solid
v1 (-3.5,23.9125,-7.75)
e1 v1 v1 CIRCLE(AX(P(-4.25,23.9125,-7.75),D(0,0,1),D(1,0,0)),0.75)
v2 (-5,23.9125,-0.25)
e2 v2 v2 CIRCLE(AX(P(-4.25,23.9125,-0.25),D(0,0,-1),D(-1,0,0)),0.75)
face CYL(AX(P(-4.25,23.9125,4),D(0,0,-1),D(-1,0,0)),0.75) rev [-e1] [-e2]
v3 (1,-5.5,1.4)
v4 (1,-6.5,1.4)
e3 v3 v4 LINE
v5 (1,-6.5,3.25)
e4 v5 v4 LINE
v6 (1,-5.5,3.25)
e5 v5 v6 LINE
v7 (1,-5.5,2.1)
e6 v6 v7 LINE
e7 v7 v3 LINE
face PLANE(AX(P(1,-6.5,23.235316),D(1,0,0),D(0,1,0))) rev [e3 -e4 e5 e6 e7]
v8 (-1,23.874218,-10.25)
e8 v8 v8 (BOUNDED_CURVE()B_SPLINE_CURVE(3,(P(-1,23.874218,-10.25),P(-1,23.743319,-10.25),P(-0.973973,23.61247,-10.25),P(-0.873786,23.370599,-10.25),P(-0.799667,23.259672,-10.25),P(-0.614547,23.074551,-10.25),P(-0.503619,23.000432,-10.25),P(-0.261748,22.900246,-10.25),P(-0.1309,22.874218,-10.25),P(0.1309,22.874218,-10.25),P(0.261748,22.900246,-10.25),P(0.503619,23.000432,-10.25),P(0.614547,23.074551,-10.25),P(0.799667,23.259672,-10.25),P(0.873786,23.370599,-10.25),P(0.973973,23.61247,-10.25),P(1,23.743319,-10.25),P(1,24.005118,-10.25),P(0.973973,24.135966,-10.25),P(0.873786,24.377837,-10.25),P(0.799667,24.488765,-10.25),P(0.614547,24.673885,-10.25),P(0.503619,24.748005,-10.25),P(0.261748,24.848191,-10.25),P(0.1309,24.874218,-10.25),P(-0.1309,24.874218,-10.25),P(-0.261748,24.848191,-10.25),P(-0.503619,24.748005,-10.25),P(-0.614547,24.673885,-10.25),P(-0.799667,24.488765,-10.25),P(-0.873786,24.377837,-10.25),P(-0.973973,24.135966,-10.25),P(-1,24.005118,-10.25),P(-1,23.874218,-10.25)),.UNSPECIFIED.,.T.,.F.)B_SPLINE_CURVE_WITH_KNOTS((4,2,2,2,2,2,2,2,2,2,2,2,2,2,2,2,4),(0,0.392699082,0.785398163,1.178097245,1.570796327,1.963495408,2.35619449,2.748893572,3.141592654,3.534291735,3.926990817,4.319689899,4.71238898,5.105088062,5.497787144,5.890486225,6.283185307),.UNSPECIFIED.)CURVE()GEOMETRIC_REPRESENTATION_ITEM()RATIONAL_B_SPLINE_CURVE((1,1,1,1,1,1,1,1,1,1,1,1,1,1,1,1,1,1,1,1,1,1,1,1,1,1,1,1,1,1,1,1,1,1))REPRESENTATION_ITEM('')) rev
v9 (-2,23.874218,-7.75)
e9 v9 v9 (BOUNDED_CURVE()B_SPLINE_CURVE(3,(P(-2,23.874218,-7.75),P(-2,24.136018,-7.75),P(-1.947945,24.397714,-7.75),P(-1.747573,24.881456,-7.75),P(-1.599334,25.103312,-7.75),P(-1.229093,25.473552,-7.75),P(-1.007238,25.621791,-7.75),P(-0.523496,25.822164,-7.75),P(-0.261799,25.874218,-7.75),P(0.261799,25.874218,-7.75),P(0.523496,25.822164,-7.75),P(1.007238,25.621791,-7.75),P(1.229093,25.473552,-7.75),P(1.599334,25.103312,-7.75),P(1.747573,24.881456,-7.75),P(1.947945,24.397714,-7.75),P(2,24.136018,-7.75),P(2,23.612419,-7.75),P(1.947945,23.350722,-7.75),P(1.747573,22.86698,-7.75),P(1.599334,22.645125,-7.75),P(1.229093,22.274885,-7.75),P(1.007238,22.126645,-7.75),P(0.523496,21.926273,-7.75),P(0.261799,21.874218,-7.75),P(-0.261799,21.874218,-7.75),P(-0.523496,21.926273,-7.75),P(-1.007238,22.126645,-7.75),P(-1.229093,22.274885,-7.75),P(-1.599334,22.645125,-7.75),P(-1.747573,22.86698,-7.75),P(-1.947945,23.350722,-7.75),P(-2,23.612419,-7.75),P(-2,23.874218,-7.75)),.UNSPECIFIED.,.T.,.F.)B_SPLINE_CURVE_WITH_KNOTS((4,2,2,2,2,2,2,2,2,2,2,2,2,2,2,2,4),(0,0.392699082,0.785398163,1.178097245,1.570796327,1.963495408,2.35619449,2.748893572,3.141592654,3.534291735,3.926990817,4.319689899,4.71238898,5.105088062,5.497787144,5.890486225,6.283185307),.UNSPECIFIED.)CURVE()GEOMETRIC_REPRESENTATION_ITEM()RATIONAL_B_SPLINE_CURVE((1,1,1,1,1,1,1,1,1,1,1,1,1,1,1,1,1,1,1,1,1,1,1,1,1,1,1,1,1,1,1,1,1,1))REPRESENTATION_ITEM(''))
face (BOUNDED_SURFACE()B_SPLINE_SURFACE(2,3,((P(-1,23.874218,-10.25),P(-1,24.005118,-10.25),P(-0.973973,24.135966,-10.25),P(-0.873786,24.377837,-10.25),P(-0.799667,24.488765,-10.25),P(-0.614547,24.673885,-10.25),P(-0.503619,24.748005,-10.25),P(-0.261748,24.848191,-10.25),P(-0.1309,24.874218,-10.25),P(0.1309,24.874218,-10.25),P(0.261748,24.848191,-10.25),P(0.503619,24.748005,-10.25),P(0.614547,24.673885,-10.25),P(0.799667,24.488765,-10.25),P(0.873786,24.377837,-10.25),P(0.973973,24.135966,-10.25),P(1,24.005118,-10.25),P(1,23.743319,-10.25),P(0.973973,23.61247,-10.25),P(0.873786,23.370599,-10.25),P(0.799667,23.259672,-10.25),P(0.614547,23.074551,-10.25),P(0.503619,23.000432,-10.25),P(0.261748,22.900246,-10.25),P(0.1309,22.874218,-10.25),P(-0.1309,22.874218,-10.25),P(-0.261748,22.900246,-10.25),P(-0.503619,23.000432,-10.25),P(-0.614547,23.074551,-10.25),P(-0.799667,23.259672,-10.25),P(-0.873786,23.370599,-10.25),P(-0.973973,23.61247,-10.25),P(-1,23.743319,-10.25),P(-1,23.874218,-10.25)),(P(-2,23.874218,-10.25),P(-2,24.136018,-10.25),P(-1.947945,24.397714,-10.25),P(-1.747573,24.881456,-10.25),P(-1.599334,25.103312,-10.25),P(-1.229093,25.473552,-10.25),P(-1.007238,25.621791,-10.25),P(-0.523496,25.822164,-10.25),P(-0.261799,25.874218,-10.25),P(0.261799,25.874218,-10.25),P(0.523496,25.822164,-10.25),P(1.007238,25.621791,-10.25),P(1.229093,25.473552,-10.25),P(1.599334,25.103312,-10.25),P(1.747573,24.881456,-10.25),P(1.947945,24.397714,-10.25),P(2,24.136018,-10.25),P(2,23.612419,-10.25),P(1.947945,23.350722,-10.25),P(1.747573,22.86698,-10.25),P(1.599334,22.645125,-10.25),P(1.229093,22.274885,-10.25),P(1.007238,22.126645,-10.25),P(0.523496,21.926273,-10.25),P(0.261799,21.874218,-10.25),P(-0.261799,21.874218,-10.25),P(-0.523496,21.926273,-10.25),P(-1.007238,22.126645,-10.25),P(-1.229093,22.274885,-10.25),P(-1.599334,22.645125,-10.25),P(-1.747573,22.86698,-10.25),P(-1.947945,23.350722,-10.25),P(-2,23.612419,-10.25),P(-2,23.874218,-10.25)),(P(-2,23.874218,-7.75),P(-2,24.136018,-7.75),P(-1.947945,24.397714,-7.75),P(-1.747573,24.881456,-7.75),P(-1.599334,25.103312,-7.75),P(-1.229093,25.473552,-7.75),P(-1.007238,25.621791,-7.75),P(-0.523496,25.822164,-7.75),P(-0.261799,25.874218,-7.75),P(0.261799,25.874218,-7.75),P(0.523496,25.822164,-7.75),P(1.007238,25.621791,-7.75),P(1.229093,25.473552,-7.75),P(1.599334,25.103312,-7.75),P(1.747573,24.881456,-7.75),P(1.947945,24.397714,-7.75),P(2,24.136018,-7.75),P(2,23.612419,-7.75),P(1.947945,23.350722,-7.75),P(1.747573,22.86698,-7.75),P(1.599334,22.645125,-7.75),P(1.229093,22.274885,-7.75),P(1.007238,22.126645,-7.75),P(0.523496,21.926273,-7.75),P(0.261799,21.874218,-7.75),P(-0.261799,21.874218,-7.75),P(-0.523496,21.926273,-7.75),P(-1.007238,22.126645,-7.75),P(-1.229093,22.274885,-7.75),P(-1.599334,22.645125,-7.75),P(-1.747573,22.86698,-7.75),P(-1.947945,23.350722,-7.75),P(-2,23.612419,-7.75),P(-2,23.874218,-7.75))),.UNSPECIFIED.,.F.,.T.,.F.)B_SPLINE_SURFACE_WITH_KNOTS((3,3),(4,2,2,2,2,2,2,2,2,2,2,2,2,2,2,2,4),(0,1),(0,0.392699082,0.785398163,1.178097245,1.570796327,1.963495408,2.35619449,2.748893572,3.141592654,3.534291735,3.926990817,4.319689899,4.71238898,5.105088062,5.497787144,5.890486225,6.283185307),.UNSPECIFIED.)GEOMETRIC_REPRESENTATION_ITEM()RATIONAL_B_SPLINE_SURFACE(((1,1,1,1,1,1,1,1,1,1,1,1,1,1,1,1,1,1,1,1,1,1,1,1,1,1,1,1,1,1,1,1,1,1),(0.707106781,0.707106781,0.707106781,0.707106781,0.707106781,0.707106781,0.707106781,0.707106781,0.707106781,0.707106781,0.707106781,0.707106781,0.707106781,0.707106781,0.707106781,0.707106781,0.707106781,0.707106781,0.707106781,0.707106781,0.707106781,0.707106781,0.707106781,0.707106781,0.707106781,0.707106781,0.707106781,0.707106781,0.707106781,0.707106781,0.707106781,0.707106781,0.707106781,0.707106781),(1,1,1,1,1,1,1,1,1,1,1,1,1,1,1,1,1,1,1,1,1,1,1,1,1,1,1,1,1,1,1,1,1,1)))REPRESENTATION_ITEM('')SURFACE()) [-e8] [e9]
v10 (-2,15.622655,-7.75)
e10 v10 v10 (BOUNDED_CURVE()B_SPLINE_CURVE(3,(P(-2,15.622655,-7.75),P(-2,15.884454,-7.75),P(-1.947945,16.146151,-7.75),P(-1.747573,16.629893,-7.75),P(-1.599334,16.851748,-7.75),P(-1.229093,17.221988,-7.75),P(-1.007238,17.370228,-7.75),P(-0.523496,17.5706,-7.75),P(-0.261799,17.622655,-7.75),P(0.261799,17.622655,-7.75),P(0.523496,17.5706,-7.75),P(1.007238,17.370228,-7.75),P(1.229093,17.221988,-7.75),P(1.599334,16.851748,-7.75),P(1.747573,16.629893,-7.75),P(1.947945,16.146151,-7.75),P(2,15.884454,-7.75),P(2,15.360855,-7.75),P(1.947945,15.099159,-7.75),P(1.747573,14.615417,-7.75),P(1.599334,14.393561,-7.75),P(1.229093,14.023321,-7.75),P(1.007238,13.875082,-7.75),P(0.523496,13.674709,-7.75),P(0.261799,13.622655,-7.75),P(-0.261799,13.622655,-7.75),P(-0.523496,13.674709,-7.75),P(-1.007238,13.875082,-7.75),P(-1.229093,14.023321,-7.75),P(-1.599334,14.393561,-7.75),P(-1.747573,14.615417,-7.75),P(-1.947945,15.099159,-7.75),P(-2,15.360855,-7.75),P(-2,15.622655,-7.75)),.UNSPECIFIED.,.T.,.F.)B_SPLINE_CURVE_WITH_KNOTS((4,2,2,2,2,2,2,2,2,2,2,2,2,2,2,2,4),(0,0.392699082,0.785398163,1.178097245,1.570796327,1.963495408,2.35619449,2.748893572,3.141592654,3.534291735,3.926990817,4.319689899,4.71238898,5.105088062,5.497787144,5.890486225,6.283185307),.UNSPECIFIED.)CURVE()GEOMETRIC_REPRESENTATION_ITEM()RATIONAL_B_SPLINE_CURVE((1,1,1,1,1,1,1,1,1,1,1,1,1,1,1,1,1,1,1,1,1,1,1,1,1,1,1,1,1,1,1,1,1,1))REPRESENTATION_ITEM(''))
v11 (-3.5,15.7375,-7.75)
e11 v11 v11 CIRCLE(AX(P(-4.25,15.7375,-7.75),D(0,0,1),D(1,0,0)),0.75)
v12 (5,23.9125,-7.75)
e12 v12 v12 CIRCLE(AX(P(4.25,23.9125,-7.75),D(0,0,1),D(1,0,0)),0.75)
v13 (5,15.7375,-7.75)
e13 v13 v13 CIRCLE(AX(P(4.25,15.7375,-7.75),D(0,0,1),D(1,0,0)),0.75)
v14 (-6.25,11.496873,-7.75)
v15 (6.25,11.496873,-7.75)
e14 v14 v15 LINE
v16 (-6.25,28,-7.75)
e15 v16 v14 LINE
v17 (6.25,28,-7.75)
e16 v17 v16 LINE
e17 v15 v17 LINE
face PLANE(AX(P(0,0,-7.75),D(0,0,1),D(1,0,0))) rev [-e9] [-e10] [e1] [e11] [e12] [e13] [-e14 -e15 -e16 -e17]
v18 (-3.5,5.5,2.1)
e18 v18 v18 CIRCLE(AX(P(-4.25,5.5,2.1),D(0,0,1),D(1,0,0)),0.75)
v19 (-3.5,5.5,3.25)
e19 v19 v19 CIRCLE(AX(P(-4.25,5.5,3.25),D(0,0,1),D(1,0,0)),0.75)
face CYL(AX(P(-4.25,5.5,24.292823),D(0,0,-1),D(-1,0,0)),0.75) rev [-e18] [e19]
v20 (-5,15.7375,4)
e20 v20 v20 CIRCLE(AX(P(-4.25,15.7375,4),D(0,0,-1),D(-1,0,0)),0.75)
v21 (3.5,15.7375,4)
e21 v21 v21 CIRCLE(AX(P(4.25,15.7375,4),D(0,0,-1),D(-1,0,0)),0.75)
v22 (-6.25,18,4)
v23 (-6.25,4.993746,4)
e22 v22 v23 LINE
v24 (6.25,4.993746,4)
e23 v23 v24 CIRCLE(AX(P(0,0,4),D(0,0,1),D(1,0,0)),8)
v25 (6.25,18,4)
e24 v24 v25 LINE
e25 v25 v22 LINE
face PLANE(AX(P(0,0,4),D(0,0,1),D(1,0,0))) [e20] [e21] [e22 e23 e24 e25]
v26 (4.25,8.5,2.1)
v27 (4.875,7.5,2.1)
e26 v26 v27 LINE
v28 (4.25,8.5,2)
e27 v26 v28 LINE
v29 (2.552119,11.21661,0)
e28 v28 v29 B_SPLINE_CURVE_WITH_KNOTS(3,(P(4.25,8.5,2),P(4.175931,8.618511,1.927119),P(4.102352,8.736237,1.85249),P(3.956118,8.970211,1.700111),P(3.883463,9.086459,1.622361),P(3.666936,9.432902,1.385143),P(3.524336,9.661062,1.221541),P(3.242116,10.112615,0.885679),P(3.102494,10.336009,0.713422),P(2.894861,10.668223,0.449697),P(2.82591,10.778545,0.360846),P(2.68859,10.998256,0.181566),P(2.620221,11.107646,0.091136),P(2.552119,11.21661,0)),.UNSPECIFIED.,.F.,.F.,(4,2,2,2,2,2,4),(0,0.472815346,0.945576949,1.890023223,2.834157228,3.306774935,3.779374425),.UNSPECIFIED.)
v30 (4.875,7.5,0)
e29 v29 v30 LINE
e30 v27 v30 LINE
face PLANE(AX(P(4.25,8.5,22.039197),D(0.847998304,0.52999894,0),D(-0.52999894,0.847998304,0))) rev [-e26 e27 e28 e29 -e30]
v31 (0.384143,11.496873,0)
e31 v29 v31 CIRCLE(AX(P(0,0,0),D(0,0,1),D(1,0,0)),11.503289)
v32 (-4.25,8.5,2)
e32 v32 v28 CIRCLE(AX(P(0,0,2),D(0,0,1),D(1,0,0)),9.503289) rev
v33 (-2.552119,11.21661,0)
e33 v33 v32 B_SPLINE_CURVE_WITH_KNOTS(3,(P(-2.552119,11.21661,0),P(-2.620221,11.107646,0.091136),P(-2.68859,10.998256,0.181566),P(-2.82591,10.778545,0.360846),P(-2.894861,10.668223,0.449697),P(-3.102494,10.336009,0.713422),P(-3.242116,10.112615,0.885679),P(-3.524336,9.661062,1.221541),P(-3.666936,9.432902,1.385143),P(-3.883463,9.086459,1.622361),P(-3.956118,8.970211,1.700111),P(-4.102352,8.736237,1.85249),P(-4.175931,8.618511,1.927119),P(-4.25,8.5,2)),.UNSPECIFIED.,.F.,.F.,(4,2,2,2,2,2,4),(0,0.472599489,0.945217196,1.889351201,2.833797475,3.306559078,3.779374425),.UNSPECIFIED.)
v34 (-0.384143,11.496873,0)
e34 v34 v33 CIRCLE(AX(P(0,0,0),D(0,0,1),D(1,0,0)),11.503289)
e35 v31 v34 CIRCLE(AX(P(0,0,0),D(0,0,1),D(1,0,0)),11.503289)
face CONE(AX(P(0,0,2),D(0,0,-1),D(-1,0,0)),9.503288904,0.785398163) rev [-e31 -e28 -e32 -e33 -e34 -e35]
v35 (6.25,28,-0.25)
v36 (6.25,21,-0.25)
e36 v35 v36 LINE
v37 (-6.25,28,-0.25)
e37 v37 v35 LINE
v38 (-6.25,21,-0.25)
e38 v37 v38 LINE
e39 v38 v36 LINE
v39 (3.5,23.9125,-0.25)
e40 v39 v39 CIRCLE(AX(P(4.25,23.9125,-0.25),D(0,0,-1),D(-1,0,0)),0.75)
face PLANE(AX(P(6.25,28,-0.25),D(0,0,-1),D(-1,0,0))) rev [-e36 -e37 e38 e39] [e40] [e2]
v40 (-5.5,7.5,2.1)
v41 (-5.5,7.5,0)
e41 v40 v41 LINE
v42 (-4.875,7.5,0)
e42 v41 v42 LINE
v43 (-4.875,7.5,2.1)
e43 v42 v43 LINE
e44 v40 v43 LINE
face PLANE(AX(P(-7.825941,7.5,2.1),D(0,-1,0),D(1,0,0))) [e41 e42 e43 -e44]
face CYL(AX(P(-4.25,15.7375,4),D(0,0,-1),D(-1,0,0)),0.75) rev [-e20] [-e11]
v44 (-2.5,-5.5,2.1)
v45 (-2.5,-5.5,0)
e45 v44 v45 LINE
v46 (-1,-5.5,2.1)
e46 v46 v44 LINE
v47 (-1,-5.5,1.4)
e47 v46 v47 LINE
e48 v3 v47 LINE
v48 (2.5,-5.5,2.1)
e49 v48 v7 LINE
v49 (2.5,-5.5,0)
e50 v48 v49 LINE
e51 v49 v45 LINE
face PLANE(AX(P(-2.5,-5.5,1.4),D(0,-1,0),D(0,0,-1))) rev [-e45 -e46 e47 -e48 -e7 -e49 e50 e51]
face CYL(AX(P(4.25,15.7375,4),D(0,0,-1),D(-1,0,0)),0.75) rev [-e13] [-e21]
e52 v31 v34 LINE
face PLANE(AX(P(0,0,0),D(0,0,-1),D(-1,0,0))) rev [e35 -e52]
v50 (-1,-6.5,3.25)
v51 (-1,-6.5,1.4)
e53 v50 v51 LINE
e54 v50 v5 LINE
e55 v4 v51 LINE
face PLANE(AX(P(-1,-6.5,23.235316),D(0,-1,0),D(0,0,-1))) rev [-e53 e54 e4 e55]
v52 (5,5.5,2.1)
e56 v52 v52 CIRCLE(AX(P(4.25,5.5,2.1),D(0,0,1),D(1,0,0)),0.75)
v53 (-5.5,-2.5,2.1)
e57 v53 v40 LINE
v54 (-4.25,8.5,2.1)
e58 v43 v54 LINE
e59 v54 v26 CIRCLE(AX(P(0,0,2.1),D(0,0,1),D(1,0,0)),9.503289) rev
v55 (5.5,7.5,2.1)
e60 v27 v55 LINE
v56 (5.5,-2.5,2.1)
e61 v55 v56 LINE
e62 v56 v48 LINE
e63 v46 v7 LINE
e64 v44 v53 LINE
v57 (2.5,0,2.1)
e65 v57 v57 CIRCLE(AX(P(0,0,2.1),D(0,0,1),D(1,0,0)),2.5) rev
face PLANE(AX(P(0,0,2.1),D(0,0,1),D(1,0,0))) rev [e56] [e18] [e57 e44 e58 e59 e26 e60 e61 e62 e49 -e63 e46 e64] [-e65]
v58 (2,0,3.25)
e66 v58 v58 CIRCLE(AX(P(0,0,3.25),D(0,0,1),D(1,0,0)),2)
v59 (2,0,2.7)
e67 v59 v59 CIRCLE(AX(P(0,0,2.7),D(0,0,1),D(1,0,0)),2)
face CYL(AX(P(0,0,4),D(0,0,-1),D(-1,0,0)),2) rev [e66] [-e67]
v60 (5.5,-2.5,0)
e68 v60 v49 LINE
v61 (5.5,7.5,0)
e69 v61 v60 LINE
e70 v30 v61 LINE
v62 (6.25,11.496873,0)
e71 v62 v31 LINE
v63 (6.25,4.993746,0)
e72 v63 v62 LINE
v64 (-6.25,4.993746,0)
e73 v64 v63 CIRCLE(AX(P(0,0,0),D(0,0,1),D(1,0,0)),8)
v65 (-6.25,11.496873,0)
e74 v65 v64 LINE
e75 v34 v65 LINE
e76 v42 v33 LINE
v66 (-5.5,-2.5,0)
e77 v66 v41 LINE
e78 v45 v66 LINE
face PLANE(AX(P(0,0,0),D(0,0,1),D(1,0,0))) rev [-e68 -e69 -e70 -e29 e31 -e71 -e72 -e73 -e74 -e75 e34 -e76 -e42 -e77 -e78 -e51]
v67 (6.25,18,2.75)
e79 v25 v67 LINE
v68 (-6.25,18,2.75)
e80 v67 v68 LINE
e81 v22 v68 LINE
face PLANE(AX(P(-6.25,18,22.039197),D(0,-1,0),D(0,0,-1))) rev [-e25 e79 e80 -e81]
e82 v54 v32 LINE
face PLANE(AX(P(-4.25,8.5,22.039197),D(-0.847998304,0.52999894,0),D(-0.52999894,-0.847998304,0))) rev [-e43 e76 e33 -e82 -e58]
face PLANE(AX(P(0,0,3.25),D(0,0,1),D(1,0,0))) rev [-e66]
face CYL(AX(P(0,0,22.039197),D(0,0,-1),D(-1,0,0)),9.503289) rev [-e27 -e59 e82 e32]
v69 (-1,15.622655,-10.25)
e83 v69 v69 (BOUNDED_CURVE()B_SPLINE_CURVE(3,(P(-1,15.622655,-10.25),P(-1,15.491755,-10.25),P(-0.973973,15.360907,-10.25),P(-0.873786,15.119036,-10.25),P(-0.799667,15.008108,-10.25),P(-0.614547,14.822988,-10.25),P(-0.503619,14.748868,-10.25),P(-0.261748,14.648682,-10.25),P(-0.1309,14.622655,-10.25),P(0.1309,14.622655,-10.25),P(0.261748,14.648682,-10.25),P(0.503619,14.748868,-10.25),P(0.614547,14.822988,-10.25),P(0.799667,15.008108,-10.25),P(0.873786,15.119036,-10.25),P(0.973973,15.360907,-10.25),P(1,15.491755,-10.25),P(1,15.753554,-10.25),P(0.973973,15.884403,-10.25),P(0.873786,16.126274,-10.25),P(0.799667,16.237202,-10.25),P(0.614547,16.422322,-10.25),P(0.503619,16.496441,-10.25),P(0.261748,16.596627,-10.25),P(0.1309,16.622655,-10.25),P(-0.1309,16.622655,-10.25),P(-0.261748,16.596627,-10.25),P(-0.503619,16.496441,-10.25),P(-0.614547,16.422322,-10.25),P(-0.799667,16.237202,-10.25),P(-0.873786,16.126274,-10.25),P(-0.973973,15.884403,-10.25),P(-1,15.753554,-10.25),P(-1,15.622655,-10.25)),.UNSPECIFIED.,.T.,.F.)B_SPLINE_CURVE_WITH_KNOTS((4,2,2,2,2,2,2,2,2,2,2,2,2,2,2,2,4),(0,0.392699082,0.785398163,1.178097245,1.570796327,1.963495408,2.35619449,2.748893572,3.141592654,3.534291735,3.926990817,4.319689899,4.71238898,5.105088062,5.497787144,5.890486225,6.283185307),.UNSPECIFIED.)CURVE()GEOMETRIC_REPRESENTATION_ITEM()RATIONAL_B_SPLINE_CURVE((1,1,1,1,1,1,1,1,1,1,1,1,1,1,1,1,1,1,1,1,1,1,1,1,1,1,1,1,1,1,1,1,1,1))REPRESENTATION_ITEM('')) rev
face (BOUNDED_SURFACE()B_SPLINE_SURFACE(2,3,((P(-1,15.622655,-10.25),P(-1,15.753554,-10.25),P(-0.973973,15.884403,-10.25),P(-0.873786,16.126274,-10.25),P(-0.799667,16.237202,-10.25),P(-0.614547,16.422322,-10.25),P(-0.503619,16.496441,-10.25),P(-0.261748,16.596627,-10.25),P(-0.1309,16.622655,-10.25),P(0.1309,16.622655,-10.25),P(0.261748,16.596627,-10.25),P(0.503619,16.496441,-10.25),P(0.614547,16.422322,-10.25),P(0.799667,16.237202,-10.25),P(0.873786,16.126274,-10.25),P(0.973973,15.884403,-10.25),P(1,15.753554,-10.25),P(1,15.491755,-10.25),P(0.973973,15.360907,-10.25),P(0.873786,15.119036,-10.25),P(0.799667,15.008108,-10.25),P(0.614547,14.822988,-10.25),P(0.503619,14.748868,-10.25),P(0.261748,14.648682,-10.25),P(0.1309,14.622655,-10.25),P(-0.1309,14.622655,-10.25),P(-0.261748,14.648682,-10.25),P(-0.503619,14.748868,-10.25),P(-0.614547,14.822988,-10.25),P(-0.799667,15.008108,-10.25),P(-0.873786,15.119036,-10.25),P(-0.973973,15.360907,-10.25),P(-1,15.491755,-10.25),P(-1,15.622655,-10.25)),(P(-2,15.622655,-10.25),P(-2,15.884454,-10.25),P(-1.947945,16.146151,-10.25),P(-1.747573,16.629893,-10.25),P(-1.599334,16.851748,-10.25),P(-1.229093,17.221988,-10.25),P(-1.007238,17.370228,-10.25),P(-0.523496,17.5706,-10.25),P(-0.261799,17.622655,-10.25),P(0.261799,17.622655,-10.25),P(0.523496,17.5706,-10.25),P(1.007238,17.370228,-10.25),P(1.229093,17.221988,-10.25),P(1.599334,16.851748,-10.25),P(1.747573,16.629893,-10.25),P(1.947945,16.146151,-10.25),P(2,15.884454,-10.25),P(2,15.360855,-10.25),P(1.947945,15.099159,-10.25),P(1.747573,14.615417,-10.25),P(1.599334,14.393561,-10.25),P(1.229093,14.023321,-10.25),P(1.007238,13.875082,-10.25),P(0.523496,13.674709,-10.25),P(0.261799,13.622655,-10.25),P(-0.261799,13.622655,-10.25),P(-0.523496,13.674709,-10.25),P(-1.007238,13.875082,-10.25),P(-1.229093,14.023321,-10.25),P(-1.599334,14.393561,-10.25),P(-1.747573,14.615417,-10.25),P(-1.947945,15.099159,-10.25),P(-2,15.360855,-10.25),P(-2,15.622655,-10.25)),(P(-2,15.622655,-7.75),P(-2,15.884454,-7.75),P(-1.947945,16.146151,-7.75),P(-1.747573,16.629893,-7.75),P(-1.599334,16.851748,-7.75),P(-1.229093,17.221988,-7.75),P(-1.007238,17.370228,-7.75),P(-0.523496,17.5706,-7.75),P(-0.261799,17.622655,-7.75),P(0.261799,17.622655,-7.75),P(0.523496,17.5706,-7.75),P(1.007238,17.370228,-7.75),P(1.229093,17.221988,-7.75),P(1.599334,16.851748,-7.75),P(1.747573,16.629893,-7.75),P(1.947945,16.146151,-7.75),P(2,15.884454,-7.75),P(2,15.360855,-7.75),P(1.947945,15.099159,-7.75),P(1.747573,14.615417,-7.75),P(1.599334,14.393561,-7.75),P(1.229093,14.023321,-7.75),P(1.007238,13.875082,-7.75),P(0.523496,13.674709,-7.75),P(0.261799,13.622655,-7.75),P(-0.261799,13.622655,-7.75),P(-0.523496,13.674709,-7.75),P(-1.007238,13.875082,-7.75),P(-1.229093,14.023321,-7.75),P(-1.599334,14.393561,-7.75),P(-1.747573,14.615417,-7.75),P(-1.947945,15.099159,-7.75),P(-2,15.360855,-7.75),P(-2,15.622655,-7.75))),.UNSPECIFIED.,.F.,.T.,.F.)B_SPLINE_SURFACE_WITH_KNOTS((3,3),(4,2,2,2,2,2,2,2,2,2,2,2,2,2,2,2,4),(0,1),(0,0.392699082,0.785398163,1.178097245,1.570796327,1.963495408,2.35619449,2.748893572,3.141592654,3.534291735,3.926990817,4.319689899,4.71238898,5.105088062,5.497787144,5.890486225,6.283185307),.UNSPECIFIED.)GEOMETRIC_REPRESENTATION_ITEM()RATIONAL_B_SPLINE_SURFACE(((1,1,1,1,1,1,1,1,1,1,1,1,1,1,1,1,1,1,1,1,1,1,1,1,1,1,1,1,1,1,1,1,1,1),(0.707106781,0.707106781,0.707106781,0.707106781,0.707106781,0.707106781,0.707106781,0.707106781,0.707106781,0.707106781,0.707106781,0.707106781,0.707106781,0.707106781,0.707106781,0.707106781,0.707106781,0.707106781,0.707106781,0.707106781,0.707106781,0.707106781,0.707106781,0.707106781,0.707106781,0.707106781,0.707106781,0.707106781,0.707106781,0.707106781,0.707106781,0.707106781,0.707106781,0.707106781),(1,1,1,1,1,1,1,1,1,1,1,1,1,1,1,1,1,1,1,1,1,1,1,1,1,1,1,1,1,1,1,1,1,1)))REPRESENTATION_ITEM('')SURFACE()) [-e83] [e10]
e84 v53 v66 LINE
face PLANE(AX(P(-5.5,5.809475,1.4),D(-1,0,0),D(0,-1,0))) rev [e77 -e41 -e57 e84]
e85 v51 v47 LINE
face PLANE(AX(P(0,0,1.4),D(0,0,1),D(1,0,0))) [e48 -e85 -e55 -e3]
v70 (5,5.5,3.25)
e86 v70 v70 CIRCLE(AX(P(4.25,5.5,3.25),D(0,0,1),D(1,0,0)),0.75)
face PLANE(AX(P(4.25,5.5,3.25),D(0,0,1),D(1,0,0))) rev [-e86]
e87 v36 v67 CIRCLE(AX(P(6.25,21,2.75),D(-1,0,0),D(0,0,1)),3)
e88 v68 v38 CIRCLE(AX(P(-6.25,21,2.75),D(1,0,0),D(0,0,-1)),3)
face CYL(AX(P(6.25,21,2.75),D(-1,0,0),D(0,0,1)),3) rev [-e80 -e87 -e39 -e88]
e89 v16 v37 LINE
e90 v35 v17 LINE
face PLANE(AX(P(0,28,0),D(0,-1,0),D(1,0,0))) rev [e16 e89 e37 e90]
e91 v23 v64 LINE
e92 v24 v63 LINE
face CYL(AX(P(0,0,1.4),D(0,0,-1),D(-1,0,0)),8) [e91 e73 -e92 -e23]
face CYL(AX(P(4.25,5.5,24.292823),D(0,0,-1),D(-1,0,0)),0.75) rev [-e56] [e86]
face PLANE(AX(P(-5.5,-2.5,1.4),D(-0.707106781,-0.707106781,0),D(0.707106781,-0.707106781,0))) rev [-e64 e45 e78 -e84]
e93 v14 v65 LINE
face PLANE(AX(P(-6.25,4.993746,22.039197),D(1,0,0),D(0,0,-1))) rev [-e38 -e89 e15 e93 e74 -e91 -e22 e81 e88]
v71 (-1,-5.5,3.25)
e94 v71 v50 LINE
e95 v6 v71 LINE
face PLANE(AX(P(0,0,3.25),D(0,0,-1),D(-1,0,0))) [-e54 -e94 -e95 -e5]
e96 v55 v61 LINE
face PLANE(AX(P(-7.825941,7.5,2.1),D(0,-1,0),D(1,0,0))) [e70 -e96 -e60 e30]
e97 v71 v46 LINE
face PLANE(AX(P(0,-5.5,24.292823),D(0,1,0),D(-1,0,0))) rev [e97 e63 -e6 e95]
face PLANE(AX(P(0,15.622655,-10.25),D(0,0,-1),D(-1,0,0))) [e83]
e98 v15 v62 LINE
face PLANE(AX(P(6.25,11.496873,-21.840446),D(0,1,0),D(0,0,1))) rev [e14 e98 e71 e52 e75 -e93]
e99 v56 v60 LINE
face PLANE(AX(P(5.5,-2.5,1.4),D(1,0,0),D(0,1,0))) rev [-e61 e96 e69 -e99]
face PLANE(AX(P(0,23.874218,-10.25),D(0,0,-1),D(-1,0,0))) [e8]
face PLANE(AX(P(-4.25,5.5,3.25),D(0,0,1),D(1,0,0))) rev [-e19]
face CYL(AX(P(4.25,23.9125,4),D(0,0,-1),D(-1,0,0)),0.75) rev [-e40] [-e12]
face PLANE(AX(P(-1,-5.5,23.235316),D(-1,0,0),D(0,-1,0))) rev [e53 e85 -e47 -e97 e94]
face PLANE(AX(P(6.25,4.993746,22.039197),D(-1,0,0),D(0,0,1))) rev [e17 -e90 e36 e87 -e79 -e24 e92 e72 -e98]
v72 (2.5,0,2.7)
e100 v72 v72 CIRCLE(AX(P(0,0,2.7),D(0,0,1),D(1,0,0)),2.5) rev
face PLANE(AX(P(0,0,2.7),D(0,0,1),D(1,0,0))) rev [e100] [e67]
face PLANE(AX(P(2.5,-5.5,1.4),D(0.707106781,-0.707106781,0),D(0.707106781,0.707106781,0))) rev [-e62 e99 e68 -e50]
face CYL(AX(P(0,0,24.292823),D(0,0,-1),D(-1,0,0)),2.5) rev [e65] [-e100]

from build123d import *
from build123d.topology import SkipClean

# Parameters (mm, degrees)
BOSS_EXTRUDE1_DEPTH     = 1.4
BOSS_EXTRUDE2_DEPTH     = 0.7
SKETCH3_W               = 2
SKETCH3_H               = 1
SKETCH3_R               = 2.5
BOSS_EXTRUDE3_DEPTH     = 0.6
SKETCH4_R               = 2
SKETCH4_R_2             = 0.75
SKETCH4_W               = 2
SKETCH4_H               = 1
BOSS_EXTRUDE4_DEPTH     = 1.3
BOSS_EXTRUDE6_REACH     = 14
CHAMFER1_SIZE           = 2
SKETCH7_W               = 12.5
SKETCH7_H               = 6.503126956
BOSS_EXTRUDE7_DEPTH     = 7.75
SKETCH8_W               = 12.5
SKETCH8_H               = 7.5
BOSS_EXTRUDE8_DEPTH     = 10
FILLET1_R               = 3
SKETCH9_W               = 11
SKETCH9_H               = 1.9
BOSS_EXTRUDE9_DEPTH     = 3.003289
BOSS_EXTRUDE10_START    = -0.75
SKETCH10_R              = 0.75
SKETCH10_R_2            = 2
SKETCH10_W              = 2
SKETCH10_H              = 1
BOSS_EXTRUDE10_DEPTH    = 0.75
SKETCH11_R              = 2
BOSS_EXTRUDE11_DEPTH    = 2.5
FILLET2_SIZE            = 2.5
FILLET2_SIZE_2          = 1
CUT_EXTRUDE1_DEPTH      = 32.401632123
CUT_EXTRUDE1_DEPTH_BACK = 32.401632123
SKETCH12_R              = 0.75
CUT_EXTRUDE2_REACH      = 34.731
SKETCH13_W              = 2.1
SKETCH13_H              = 1


with BuildPart() as part:
    # Sketch1 → Boss-Extrude1 (new body)
    with BuildSketch(Plane.XY):
        with BuildLine():
            Line((-5.5, 5.809475019), (-5.5, -2.5))
            Line((-5.5, -2.5), (-2.5, -5.5))
            Line((-2.5, -5.5), (2.5, -5.5))
            Line((2.5, -5.5), (5.5, -2.5))
            Line((5.5, -2.5), (5.5, 5.809475019))
            ThreePointArc((5.5, 5.809475019), (0, -8), (-5.5, 5.809475019))
        make_face()
    extrude(amount=BOSS_EXTRUDE1_DEPTH)

    # Sketch2 → Boss-Extrude2 (add)
    with BuildSketch(Plane.XY.offset(1.4)):
        with BuildLine():
            Line((-1, -5.5), (-1, -6.5))
            Line((-1, -6.5), (1, -6.5))
            Line((1, -6.5), (1, -5.5))
            Line((1, -5.5), (2.5, -5.5))
            Line((2.5, -5.5), (5.5, -2.5))
            Line((5.5, -2.5), (5.5, 5.809475019))
            ThreePointArc((5.5, 5.809475019), (0, -8), (-5.5, 5.809475019))
            Line((-5.5, 5.809475019), (-5.5, -2.5))
            Line((-5.5, -2.5), (-2.5, -5.5))
            Line((-2.5, -5.5), (-1, -5.5))
        make_face()
    extrude(amount=BOSS_EXTRUDE2_DEPTH)

    # Sketch3 → Boss-Extrude3 (add)
    with BuildSketch(Plane.XY.offset(2.1)):
        with BuildLine():
            Line((-5.5, 6.5), (-5.5, 5.809475019))
            ThreePointArc((-5.5, 5.809475019), (0, -8), (5.5, 5.809475019))
            Line((5.5, 5.809475019), (5.5, 6.5))
            Line((5.5, 6.5), (-5.5, 6.5))
        make_face()
        with Locations((0, -6)):
            Rectangle(SKETCH3_W, SKETCH3_H, mode=Mode.SUBTRACT)
        Circle(SKETCH3_R, mode=Mode.SUBTRACT)
        with BuildLine():
            ThreePointArc((-3.499999999, 5.5), (-4.249999999, 4.75), (-4.999999999, 5.5))
            ThreePointArc((-4.999999999, 5.5), (-4.249999999, 6.25), (-3.499999999, 5.5))
        make_face(mode=Mode.SUBTRACT)
        with BuildLine():
            ThreePointArc((5.000000001, 5.5), (4.250000001, 4.75), (3.500000001, 5.5))
            ThreePointArc((3.500000001, 5.5), (4.250000001, 6.25), (5.000000001, 5.5))
        make_face(mode=Mode.SUBTRACT)
    extrude(amount=BOSS_EXTRUDE3_DEPTH)

    # Sketch4 → Boss-Extrude4 (add)
    with SkipClean():  # the faces are left unmerged after this step: merging them gives an invalid solid
        with BuildSketch(Plane.XY.offset(2.7)):
            with BuildLine():
                Line((-5.5, 5.809475019), (-5.5, 6.5))
                Line((-5.5, 6.5), (5.5, 6.5))
                Line((5.5, 6.5), (5.5, 5.809475019))
                ThreePointArc((5.5, 5.809475019), (0, -8), (-5.5, 5.809475019))
            make_face()
            Circle(SKETCH4_R, mode=Mode.SUBTRACT)
            with Locations((-4.249999999, 5.5)):
                Circle(SKETCH4_R_2, mode=Mode.SUBTRACT)
            with Locations((4.250000001, 5.5)):
                Circle(SKETCH4_R_2, mode=Mode.SUBTRACT)
            with Locations((0, -6)):
                Rectangle(SKETCH4_W, SKETCH4_H, mode=Mode.SUBTRACT)
        extrude(amount=BOSS_EXTRUDE4_DEPTH)

    # Boss-Extrude6: up to this face of the body (flat: up to its plane)
    boss_extrude6_end = Plane(part.part.faces().sort_by_distance((0, -7.784071771, 4))[0])
    # Sketch5 → Boss-Extrude6 (add, up to the picked face)
    with BuildSketch(Plane.XY, mode=Mode.PRIVATE) as boss_extrude6_sk1:
        with BuildLine():
            Line((-6.25, 4.993746089), (-6.25, 18))
            Line((-6.25, 18), (6.25, 18))
            Line((6.25, 18), (6.25, 4.993746089))
            ThreePointArc((6.25, 4.993746089), (5.88914072, 5.414611858), (5.5, 5.809475019))
            Line((5.5, 5.809475019), (5.5, 6.5))
            Line((5.5, 6.5), (4.249999999, 8.5))
            ThreePointArc((4.249999999, 8.5), (0, 9.503288904), (-4.249999999, 8.5))
            Line((-4.249999999, 8.5), (-5.5, 6.5))
            Line((-5.5, 6.5), (-5.5, 5.809475019))
            ThreePointArc((-5.5, 5.809475019), (-5.88914072, 5.414611858), (-6.25, 4.993746089))
        make_face()
    boss_extrude6_tool1 = split(extrude(boss_extrude6_sk1.sketch, amount=BOSS_EXTRUDE6_REACH, mode=Mode.PRIVATE), bisect_by=boss_extrude6_end, keep=Keep.BOTH, mode=Mode.PRIVATE)
    add(boss_extrude6_tool1.solids().sort_by(Axis((0, 13.103061, 0), (0, 0, 1)))[0])

    # Chamfer1
    chamfer1_edges = [part.edges().sort_by_distance(p)[0] for p in [
        (0, 9.503288904, 0),
    ]]
    chamfer(chamfer1_edges, length=CHAMFER1_SIZE)

    # Sketch7 → Boss-Extrude7 (add)
    with BuildSketch(Plane(origin=(0, 0, 0), x_dir=(-1, 0, 0), z_dir=(0, 0, -1))):
        with Locations((0, 14.748436522)):
            Rectangle(SKETCH7_W, SKETCH7_H)
    extrude(amount=BOSS_EXTRUDE7_DEPTH)

    # Sketch8 → Boss-Extrude8 (add)
    with SkipClean():  # the faces are left unmerged after this step: merging them gives an invalid solid
        with BuildSketch(Plane(origin=(0, 18, 0), x_dir=(1, 0, 0), z_dir=(0, 1, 0))):
            with Locations((0, 4)):
                Rectangle(SKETCH8_W, SKETCH8_H)
        extrude(amount=BOSS_EXTRUDE8_DEPTH)

    # Fillet1
    # the kernel refuses this fillet: 3 mm, written as the material it adds along each edge
    with BuildSketch(Plane(origin=(-6.25, 18, -0.25), x_dir=(0, 0, 1), z_dir=(1, 0, 0))) as fillet1_piece_1:
        with BuildLine():
            CenterArc((FILLET1_R, -FILLET1_R), FILLET1_R, 90, 90)
            Line((0, -FILLET1_R), (0, 0))
            Line((0, 0), (FILLET1_R, 0))
        make_face()
    extrude(amount=12.5)

    # Sketch9 → Boss-Extrude9 (add)
    with BuildSketch(Plane(origin=(0, 6.5, 0), x_dir=(1, 0, 0), z_dir=(0, 1, 0))):
        with Locations((0, -3.05)):
            Rectangle(SKETCH9_W, SKETCH9_H)
    extrude(amount=BOSS_EXTRUDE9_DEPTH)

    # Sketch10 → Boss-Extrude10 (add)
    with SkipClean():  # the faces are left unmerged after this step: merging them gives an invalid solid
        with BuildSketch(Plane.XY.offset(4).offset(BOSS_EXTRUDE10_START)):
            with Locations((4.250000001, 5.5)):
                Circle(SKETCH10_R)
            with Locations((-4.249999999, 5.5)):
                Circle(SKETCH10_R)
            Circle(SKETCH10_R_2)
            with Locations((0, -6)):
                Rectangle(SKETCH10_W, SKETCH10_H)
        extrude(amount=BOSS_EXTRUDE10_DEPTH)
    add(part.part.scale(1), mode=Mode.REPLACE)  # the faces are merged on a copy

    # Sketch11 → Boss-Extrude11 (add)
    with BuildSketch(Plane(origin=(0, 0, -7.75), x_dir=(-1, 0, 0), z_dir=(0, 0, -1))):
        with Locations(Location((0, 15.622654783, 0), (0, 0, 180))):
            Circle(SKETCH11_R)
        with Locations(Location((0, 23.874218261, 0), (0, 0, 180))):
            Circle(SKETCH11_R)
    extrude(amount=BOSS_EXTRUDE11_DEPTH)

    # Fillet2
    # an asymmetric fillet: 2.5, 1 mm, written as the material it takes off along each edge
    with BuildSketch(Plane(origin=(0, 15.622654783, -10.25), x_dir=(1, 0, 0), z_dir=(0, 1, 0))) as fillet2_piece_1:
        with BuildLine():
            Bezier((2, -FILLET2_SIZE), (2, 0), (2 - FILLET2_SIZE_2, 0), weights=[1, 0.707106781, 1])
            Line((2 - FILLET2_SIZE_2, 0), (2, 0))
            Line((2, 0), (2, -FILLET2_SIZE))
        make_face()
    revolve(axis=Axis((0, 15.622654783, -10.25), (0, 0, -1)), mode=Mode.SUBTRACT)
    with BuildSketch(Plane(origin=(0, 23.874218261, -10.25), x_dir=(1, 0, 0), z_dir=(0, 1, 0))) as fillet2_piece_2:
        with BuildLine():
            Bezier((2, -FILLET2_SIZE), (2, 0), (2 - FILLET2_SIZE_2, 0), weights=[1, 0.707106781, 1])
            Line((2 - FILLET2_SIZE_2, 0), (2, 0))
            Line((2, 0), (2, -FILLET2_SIZE))
        make_face()
    revolve(axis=Axis((0, 23.874218261, -10.25), (0, 0, -1)), mode=Mode.SUBTRACT)

    # Sketch12 → Cut-Extrude1 (cut, two sides: drawn at the far end of the back side and taken through both)
    with BuildSketch(Plane(origin=(0, 0, -7.75), x_dir=(-1, 0, 0), z_dir=(0, 0, -1)).offset(-CUT_EXTRUDE1_DEPTH_BACK)):
        with Locations((-4.25, 15.7375)):
            Circle(SKETCH12_R)
        with Locations((-4.25, 23.9125)):
            Circle(SKETCH12_R)
        with Locations((4.25, 23.9125)):
            Circle(SKETCH12_R)
        with Locations((4.25, 15.7375)):
            Circle(SKETCH12_R)
    extrude(amount=CUT_EXTRUDE1_DEPTH + CUT_EXTRUDE1_DEPTH_BACK, mode=Mode.SUBTRACT)

    # Cut-Extrude2: up to this face of the body (flat: up to its plane)
    cut_extrude2_end = Plane(part.part.faces().sort_by_distance((-5.5, 2, 1.05))[0])
    # Sketch13 → Cut-Extrude2 (cut, up to the picked face)
    with BuildSketch(Plane.ZY.offset(-5.5), mode=Mode.PRIVATE) as cut_extrude2_sk1:
        with Locations((1.05, 7)):
            Rectangle(SKETCH13_W, SKETCH13_H)
    cut_extrude2_tool1 = split(extrude(cut_extrude2_sk1.sketch, amount=CUT_EXTRUDE2_REACH, mode=Mode.PRIVATE), bisect_by=cut_extrude2_end, keep=Keep.BOTH, mode=Mode.PRIVATE)
    add(cut_extrude2_tool1.solids().sort_by(Axis((5.5, 7, 1.05), (-1, 0, 0)))[0], mode=Mode.SUBTRACT)


solid = part.part
